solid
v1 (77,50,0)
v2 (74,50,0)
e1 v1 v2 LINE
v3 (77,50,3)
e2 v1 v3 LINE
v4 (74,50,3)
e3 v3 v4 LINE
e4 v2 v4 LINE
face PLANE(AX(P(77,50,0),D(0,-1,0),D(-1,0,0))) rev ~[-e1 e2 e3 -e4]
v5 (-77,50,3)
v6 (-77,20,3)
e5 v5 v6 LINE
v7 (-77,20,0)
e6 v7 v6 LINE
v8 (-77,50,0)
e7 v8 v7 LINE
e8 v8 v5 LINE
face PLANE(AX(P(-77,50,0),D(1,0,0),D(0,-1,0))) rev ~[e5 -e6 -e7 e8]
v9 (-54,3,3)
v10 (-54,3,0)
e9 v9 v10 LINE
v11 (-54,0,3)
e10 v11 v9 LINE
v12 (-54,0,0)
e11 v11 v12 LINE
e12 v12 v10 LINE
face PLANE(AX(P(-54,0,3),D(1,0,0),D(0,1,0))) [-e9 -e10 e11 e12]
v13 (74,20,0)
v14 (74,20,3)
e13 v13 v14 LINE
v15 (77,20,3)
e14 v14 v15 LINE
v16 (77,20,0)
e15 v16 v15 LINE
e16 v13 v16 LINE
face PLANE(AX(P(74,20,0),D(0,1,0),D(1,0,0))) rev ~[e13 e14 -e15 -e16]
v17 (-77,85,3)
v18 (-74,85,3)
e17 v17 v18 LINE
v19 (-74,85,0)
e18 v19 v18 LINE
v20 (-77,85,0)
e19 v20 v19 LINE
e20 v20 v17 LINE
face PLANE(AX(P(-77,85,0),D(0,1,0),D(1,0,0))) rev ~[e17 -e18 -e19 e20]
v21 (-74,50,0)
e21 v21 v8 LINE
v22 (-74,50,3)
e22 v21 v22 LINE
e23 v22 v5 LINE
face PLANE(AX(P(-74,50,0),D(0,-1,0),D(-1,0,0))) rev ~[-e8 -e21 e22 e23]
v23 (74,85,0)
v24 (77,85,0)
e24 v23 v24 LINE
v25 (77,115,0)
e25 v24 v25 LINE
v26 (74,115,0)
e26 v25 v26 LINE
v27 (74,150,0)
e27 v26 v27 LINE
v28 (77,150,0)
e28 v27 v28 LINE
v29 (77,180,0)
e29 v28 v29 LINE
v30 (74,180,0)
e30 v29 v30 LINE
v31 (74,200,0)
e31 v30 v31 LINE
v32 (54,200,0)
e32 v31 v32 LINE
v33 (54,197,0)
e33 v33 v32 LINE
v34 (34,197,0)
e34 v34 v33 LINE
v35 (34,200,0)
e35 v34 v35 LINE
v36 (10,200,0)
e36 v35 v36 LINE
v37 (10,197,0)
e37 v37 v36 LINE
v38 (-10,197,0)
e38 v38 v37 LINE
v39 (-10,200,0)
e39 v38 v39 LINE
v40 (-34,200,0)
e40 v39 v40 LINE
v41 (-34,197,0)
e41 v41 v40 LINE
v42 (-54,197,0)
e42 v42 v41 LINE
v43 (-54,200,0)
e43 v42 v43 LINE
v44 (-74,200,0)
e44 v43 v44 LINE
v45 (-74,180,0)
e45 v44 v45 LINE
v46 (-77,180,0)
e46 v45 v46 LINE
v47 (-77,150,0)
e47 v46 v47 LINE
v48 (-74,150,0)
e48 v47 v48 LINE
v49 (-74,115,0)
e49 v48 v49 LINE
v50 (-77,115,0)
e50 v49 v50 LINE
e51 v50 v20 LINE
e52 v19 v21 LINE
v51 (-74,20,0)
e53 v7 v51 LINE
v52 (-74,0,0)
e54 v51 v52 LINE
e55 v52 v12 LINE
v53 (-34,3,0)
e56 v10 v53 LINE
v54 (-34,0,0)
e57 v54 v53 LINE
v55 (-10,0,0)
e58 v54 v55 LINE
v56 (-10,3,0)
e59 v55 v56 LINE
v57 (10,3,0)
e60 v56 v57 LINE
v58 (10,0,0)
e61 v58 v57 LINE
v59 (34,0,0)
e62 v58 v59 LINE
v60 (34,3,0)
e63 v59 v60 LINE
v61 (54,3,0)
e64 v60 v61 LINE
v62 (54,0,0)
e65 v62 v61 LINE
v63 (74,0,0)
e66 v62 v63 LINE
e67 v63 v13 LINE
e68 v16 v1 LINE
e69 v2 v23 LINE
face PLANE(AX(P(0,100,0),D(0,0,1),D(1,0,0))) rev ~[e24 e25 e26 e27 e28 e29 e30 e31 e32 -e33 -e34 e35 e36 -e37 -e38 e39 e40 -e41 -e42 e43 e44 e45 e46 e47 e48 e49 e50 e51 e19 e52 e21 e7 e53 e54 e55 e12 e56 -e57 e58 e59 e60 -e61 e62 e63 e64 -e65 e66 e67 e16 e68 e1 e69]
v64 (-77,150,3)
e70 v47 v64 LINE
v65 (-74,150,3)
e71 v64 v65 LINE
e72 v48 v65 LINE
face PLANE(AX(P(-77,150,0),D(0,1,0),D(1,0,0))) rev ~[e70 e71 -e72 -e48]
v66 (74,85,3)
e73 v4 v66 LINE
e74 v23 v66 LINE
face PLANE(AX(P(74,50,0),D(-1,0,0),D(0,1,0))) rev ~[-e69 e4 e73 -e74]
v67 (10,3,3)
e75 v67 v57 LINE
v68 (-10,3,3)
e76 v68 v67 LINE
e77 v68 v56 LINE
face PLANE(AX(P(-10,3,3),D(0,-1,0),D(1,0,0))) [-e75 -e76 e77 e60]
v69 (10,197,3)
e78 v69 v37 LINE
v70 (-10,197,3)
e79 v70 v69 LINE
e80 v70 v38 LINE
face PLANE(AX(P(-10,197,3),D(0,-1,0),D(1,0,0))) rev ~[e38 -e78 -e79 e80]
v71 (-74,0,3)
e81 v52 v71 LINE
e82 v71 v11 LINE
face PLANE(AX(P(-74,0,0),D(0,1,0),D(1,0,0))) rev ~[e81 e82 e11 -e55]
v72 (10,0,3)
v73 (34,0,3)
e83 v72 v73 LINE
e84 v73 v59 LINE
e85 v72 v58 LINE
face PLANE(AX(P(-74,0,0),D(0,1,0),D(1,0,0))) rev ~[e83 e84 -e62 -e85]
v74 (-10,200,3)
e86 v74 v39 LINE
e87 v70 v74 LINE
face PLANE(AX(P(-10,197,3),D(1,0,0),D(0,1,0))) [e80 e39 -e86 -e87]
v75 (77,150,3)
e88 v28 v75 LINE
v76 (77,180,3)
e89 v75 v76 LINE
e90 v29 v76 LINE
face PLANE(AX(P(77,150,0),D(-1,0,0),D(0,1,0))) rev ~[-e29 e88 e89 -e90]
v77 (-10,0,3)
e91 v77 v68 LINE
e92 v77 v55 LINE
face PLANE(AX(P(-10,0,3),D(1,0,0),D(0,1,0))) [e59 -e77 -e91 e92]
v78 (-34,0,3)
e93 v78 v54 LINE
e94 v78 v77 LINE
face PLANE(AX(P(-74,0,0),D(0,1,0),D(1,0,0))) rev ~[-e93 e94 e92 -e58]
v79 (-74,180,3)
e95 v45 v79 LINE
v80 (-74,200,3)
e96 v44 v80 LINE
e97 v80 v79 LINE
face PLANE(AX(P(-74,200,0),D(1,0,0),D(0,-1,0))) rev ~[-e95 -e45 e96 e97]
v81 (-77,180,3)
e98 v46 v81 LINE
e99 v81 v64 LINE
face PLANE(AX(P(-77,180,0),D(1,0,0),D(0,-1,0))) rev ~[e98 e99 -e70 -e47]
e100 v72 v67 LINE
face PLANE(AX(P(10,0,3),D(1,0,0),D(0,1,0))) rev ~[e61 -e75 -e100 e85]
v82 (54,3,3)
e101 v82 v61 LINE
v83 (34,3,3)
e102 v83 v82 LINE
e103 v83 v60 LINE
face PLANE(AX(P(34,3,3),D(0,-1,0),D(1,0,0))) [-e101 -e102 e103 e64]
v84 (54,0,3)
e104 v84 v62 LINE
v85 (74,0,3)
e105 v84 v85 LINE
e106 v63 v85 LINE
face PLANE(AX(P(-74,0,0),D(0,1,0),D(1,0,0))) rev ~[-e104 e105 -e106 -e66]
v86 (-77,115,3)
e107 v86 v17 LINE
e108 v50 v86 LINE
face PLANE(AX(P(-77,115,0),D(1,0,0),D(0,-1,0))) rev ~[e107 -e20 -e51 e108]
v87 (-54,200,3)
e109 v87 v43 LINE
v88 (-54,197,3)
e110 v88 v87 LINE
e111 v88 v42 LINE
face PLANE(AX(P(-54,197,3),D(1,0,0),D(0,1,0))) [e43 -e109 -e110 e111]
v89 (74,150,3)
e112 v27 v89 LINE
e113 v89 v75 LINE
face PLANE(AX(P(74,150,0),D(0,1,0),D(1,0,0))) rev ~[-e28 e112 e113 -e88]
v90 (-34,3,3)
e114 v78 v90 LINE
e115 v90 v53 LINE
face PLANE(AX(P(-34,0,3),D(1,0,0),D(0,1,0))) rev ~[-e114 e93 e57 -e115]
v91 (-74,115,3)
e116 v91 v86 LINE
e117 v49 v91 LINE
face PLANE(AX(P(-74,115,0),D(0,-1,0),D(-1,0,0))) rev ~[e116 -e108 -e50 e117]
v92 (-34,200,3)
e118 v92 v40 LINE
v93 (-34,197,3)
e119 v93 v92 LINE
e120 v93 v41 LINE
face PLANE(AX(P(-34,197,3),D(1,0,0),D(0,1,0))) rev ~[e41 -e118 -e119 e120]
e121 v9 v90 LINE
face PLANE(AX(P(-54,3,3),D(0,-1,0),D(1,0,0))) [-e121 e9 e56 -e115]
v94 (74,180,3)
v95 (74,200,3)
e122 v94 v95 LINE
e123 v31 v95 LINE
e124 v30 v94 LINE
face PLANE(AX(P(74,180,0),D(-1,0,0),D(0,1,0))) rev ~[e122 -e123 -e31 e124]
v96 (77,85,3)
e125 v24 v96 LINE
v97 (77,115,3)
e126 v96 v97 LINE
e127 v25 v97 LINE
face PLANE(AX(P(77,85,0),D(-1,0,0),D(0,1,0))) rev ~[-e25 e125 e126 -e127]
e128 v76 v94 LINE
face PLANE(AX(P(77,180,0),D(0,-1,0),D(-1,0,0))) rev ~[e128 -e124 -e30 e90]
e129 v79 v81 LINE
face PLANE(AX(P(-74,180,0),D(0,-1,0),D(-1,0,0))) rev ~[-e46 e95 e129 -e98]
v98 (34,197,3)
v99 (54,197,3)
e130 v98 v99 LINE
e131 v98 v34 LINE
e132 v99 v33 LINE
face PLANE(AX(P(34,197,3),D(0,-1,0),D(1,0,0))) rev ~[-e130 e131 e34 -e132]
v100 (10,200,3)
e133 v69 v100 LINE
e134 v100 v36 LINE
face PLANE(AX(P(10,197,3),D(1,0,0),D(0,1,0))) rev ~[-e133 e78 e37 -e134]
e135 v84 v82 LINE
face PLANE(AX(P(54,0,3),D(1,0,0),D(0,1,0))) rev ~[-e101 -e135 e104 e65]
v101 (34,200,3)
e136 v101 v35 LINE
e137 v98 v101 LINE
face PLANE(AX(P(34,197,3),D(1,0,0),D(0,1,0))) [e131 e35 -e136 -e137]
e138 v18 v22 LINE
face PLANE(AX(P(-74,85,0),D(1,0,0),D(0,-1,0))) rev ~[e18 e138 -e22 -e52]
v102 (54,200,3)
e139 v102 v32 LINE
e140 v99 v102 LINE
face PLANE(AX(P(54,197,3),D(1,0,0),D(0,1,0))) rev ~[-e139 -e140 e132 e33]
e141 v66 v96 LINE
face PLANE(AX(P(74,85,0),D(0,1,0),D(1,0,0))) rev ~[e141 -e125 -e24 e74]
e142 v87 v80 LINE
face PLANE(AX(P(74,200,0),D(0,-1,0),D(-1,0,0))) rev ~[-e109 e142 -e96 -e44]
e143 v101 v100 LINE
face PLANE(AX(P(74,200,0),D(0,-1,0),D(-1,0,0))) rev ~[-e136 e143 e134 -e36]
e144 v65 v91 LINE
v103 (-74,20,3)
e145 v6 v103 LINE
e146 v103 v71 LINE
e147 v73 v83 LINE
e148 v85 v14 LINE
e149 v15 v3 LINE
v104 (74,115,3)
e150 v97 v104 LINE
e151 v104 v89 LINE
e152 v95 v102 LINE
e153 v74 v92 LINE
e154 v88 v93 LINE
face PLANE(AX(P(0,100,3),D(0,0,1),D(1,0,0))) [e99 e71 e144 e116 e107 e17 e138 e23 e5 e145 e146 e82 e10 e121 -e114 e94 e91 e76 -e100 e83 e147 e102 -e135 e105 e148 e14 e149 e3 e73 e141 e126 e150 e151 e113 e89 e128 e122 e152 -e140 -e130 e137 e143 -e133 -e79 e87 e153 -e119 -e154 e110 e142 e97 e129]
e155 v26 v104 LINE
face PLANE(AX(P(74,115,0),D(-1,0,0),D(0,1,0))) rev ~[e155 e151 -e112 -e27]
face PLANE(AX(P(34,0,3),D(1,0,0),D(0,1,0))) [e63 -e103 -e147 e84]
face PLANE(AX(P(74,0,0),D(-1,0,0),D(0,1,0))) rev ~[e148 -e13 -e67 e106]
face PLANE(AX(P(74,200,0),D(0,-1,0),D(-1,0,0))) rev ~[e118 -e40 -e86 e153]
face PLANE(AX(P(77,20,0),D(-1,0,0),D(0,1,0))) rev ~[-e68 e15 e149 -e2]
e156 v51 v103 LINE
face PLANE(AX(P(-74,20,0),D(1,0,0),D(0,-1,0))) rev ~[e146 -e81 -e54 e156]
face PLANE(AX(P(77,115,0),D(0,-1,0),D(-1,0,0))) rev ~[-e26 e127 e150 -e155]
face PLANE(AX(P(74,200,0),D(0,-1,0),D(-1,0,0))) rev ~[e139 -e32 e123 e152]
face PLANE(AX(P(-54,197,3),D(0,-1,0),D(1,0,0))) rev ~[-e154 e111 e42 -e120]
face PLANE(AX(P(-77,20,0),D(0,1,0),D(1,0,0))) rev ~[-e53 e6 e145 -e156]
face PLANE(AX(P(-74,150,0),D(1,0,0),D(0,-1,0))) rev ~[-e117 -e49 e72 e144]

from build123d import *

# Parameters (mm, degrees)
F1_DEPTH = 3
F2_W     = 20
F2_H     = 3
F3_DEPTH = 3.001


# Not quite as in the source:
# - a feature names something its author has since deleted; it is built from what else it names


with BuildPart() as f1:
    # F0 (on Top) → F1 (new body)
    with BuildSketch(Plane.XY):
        Polygon((-74, 0), (0, 0), (74, 0), (74, 20), (77, 20), (77, 50), (74, 50), (74, 85), (77, 85), (77, 115), (74, 115), (74, 150), (77, 150), (77, 180), (74, 180), (74, 200), (0, 200), (-74, 200), (-74, 180), (-77, 180), (-77, 150), (-74, 150), (-74, 115), (-77, 115), (-77, 85), (-74, 85), (-74, 50), (-77, 50), (-77, 20), (-74, 20), align=None)
    extrude(amount=F1_DEPTH)

    # F2 (on face) → F3 (cut, through all)
    with BuildSketch(Plane.XY.offset(3)):
        with Locations((-44, 1.5)):
            Rectangle(F2_W, F2_H)
        with Locations((44, 1.5)):
            Rectangle(F2_W, F2_H)
        with Locations((0, 1.5)):
            Rectangle(F2_W, F2_H)
        with Locations((-44, 198.5)):
            Rectangle(F2_W, F2_H)
        with Locations((44, 198.5)):
            Rectangle(F2_W, F2_H)
        with Locations((0, 198.5)):
            Rectangle(F2_W, F2_H)
    extrude(amount=-F3_DEPTH, mode=Mode.SUBTRACT)


solid = f1.part
